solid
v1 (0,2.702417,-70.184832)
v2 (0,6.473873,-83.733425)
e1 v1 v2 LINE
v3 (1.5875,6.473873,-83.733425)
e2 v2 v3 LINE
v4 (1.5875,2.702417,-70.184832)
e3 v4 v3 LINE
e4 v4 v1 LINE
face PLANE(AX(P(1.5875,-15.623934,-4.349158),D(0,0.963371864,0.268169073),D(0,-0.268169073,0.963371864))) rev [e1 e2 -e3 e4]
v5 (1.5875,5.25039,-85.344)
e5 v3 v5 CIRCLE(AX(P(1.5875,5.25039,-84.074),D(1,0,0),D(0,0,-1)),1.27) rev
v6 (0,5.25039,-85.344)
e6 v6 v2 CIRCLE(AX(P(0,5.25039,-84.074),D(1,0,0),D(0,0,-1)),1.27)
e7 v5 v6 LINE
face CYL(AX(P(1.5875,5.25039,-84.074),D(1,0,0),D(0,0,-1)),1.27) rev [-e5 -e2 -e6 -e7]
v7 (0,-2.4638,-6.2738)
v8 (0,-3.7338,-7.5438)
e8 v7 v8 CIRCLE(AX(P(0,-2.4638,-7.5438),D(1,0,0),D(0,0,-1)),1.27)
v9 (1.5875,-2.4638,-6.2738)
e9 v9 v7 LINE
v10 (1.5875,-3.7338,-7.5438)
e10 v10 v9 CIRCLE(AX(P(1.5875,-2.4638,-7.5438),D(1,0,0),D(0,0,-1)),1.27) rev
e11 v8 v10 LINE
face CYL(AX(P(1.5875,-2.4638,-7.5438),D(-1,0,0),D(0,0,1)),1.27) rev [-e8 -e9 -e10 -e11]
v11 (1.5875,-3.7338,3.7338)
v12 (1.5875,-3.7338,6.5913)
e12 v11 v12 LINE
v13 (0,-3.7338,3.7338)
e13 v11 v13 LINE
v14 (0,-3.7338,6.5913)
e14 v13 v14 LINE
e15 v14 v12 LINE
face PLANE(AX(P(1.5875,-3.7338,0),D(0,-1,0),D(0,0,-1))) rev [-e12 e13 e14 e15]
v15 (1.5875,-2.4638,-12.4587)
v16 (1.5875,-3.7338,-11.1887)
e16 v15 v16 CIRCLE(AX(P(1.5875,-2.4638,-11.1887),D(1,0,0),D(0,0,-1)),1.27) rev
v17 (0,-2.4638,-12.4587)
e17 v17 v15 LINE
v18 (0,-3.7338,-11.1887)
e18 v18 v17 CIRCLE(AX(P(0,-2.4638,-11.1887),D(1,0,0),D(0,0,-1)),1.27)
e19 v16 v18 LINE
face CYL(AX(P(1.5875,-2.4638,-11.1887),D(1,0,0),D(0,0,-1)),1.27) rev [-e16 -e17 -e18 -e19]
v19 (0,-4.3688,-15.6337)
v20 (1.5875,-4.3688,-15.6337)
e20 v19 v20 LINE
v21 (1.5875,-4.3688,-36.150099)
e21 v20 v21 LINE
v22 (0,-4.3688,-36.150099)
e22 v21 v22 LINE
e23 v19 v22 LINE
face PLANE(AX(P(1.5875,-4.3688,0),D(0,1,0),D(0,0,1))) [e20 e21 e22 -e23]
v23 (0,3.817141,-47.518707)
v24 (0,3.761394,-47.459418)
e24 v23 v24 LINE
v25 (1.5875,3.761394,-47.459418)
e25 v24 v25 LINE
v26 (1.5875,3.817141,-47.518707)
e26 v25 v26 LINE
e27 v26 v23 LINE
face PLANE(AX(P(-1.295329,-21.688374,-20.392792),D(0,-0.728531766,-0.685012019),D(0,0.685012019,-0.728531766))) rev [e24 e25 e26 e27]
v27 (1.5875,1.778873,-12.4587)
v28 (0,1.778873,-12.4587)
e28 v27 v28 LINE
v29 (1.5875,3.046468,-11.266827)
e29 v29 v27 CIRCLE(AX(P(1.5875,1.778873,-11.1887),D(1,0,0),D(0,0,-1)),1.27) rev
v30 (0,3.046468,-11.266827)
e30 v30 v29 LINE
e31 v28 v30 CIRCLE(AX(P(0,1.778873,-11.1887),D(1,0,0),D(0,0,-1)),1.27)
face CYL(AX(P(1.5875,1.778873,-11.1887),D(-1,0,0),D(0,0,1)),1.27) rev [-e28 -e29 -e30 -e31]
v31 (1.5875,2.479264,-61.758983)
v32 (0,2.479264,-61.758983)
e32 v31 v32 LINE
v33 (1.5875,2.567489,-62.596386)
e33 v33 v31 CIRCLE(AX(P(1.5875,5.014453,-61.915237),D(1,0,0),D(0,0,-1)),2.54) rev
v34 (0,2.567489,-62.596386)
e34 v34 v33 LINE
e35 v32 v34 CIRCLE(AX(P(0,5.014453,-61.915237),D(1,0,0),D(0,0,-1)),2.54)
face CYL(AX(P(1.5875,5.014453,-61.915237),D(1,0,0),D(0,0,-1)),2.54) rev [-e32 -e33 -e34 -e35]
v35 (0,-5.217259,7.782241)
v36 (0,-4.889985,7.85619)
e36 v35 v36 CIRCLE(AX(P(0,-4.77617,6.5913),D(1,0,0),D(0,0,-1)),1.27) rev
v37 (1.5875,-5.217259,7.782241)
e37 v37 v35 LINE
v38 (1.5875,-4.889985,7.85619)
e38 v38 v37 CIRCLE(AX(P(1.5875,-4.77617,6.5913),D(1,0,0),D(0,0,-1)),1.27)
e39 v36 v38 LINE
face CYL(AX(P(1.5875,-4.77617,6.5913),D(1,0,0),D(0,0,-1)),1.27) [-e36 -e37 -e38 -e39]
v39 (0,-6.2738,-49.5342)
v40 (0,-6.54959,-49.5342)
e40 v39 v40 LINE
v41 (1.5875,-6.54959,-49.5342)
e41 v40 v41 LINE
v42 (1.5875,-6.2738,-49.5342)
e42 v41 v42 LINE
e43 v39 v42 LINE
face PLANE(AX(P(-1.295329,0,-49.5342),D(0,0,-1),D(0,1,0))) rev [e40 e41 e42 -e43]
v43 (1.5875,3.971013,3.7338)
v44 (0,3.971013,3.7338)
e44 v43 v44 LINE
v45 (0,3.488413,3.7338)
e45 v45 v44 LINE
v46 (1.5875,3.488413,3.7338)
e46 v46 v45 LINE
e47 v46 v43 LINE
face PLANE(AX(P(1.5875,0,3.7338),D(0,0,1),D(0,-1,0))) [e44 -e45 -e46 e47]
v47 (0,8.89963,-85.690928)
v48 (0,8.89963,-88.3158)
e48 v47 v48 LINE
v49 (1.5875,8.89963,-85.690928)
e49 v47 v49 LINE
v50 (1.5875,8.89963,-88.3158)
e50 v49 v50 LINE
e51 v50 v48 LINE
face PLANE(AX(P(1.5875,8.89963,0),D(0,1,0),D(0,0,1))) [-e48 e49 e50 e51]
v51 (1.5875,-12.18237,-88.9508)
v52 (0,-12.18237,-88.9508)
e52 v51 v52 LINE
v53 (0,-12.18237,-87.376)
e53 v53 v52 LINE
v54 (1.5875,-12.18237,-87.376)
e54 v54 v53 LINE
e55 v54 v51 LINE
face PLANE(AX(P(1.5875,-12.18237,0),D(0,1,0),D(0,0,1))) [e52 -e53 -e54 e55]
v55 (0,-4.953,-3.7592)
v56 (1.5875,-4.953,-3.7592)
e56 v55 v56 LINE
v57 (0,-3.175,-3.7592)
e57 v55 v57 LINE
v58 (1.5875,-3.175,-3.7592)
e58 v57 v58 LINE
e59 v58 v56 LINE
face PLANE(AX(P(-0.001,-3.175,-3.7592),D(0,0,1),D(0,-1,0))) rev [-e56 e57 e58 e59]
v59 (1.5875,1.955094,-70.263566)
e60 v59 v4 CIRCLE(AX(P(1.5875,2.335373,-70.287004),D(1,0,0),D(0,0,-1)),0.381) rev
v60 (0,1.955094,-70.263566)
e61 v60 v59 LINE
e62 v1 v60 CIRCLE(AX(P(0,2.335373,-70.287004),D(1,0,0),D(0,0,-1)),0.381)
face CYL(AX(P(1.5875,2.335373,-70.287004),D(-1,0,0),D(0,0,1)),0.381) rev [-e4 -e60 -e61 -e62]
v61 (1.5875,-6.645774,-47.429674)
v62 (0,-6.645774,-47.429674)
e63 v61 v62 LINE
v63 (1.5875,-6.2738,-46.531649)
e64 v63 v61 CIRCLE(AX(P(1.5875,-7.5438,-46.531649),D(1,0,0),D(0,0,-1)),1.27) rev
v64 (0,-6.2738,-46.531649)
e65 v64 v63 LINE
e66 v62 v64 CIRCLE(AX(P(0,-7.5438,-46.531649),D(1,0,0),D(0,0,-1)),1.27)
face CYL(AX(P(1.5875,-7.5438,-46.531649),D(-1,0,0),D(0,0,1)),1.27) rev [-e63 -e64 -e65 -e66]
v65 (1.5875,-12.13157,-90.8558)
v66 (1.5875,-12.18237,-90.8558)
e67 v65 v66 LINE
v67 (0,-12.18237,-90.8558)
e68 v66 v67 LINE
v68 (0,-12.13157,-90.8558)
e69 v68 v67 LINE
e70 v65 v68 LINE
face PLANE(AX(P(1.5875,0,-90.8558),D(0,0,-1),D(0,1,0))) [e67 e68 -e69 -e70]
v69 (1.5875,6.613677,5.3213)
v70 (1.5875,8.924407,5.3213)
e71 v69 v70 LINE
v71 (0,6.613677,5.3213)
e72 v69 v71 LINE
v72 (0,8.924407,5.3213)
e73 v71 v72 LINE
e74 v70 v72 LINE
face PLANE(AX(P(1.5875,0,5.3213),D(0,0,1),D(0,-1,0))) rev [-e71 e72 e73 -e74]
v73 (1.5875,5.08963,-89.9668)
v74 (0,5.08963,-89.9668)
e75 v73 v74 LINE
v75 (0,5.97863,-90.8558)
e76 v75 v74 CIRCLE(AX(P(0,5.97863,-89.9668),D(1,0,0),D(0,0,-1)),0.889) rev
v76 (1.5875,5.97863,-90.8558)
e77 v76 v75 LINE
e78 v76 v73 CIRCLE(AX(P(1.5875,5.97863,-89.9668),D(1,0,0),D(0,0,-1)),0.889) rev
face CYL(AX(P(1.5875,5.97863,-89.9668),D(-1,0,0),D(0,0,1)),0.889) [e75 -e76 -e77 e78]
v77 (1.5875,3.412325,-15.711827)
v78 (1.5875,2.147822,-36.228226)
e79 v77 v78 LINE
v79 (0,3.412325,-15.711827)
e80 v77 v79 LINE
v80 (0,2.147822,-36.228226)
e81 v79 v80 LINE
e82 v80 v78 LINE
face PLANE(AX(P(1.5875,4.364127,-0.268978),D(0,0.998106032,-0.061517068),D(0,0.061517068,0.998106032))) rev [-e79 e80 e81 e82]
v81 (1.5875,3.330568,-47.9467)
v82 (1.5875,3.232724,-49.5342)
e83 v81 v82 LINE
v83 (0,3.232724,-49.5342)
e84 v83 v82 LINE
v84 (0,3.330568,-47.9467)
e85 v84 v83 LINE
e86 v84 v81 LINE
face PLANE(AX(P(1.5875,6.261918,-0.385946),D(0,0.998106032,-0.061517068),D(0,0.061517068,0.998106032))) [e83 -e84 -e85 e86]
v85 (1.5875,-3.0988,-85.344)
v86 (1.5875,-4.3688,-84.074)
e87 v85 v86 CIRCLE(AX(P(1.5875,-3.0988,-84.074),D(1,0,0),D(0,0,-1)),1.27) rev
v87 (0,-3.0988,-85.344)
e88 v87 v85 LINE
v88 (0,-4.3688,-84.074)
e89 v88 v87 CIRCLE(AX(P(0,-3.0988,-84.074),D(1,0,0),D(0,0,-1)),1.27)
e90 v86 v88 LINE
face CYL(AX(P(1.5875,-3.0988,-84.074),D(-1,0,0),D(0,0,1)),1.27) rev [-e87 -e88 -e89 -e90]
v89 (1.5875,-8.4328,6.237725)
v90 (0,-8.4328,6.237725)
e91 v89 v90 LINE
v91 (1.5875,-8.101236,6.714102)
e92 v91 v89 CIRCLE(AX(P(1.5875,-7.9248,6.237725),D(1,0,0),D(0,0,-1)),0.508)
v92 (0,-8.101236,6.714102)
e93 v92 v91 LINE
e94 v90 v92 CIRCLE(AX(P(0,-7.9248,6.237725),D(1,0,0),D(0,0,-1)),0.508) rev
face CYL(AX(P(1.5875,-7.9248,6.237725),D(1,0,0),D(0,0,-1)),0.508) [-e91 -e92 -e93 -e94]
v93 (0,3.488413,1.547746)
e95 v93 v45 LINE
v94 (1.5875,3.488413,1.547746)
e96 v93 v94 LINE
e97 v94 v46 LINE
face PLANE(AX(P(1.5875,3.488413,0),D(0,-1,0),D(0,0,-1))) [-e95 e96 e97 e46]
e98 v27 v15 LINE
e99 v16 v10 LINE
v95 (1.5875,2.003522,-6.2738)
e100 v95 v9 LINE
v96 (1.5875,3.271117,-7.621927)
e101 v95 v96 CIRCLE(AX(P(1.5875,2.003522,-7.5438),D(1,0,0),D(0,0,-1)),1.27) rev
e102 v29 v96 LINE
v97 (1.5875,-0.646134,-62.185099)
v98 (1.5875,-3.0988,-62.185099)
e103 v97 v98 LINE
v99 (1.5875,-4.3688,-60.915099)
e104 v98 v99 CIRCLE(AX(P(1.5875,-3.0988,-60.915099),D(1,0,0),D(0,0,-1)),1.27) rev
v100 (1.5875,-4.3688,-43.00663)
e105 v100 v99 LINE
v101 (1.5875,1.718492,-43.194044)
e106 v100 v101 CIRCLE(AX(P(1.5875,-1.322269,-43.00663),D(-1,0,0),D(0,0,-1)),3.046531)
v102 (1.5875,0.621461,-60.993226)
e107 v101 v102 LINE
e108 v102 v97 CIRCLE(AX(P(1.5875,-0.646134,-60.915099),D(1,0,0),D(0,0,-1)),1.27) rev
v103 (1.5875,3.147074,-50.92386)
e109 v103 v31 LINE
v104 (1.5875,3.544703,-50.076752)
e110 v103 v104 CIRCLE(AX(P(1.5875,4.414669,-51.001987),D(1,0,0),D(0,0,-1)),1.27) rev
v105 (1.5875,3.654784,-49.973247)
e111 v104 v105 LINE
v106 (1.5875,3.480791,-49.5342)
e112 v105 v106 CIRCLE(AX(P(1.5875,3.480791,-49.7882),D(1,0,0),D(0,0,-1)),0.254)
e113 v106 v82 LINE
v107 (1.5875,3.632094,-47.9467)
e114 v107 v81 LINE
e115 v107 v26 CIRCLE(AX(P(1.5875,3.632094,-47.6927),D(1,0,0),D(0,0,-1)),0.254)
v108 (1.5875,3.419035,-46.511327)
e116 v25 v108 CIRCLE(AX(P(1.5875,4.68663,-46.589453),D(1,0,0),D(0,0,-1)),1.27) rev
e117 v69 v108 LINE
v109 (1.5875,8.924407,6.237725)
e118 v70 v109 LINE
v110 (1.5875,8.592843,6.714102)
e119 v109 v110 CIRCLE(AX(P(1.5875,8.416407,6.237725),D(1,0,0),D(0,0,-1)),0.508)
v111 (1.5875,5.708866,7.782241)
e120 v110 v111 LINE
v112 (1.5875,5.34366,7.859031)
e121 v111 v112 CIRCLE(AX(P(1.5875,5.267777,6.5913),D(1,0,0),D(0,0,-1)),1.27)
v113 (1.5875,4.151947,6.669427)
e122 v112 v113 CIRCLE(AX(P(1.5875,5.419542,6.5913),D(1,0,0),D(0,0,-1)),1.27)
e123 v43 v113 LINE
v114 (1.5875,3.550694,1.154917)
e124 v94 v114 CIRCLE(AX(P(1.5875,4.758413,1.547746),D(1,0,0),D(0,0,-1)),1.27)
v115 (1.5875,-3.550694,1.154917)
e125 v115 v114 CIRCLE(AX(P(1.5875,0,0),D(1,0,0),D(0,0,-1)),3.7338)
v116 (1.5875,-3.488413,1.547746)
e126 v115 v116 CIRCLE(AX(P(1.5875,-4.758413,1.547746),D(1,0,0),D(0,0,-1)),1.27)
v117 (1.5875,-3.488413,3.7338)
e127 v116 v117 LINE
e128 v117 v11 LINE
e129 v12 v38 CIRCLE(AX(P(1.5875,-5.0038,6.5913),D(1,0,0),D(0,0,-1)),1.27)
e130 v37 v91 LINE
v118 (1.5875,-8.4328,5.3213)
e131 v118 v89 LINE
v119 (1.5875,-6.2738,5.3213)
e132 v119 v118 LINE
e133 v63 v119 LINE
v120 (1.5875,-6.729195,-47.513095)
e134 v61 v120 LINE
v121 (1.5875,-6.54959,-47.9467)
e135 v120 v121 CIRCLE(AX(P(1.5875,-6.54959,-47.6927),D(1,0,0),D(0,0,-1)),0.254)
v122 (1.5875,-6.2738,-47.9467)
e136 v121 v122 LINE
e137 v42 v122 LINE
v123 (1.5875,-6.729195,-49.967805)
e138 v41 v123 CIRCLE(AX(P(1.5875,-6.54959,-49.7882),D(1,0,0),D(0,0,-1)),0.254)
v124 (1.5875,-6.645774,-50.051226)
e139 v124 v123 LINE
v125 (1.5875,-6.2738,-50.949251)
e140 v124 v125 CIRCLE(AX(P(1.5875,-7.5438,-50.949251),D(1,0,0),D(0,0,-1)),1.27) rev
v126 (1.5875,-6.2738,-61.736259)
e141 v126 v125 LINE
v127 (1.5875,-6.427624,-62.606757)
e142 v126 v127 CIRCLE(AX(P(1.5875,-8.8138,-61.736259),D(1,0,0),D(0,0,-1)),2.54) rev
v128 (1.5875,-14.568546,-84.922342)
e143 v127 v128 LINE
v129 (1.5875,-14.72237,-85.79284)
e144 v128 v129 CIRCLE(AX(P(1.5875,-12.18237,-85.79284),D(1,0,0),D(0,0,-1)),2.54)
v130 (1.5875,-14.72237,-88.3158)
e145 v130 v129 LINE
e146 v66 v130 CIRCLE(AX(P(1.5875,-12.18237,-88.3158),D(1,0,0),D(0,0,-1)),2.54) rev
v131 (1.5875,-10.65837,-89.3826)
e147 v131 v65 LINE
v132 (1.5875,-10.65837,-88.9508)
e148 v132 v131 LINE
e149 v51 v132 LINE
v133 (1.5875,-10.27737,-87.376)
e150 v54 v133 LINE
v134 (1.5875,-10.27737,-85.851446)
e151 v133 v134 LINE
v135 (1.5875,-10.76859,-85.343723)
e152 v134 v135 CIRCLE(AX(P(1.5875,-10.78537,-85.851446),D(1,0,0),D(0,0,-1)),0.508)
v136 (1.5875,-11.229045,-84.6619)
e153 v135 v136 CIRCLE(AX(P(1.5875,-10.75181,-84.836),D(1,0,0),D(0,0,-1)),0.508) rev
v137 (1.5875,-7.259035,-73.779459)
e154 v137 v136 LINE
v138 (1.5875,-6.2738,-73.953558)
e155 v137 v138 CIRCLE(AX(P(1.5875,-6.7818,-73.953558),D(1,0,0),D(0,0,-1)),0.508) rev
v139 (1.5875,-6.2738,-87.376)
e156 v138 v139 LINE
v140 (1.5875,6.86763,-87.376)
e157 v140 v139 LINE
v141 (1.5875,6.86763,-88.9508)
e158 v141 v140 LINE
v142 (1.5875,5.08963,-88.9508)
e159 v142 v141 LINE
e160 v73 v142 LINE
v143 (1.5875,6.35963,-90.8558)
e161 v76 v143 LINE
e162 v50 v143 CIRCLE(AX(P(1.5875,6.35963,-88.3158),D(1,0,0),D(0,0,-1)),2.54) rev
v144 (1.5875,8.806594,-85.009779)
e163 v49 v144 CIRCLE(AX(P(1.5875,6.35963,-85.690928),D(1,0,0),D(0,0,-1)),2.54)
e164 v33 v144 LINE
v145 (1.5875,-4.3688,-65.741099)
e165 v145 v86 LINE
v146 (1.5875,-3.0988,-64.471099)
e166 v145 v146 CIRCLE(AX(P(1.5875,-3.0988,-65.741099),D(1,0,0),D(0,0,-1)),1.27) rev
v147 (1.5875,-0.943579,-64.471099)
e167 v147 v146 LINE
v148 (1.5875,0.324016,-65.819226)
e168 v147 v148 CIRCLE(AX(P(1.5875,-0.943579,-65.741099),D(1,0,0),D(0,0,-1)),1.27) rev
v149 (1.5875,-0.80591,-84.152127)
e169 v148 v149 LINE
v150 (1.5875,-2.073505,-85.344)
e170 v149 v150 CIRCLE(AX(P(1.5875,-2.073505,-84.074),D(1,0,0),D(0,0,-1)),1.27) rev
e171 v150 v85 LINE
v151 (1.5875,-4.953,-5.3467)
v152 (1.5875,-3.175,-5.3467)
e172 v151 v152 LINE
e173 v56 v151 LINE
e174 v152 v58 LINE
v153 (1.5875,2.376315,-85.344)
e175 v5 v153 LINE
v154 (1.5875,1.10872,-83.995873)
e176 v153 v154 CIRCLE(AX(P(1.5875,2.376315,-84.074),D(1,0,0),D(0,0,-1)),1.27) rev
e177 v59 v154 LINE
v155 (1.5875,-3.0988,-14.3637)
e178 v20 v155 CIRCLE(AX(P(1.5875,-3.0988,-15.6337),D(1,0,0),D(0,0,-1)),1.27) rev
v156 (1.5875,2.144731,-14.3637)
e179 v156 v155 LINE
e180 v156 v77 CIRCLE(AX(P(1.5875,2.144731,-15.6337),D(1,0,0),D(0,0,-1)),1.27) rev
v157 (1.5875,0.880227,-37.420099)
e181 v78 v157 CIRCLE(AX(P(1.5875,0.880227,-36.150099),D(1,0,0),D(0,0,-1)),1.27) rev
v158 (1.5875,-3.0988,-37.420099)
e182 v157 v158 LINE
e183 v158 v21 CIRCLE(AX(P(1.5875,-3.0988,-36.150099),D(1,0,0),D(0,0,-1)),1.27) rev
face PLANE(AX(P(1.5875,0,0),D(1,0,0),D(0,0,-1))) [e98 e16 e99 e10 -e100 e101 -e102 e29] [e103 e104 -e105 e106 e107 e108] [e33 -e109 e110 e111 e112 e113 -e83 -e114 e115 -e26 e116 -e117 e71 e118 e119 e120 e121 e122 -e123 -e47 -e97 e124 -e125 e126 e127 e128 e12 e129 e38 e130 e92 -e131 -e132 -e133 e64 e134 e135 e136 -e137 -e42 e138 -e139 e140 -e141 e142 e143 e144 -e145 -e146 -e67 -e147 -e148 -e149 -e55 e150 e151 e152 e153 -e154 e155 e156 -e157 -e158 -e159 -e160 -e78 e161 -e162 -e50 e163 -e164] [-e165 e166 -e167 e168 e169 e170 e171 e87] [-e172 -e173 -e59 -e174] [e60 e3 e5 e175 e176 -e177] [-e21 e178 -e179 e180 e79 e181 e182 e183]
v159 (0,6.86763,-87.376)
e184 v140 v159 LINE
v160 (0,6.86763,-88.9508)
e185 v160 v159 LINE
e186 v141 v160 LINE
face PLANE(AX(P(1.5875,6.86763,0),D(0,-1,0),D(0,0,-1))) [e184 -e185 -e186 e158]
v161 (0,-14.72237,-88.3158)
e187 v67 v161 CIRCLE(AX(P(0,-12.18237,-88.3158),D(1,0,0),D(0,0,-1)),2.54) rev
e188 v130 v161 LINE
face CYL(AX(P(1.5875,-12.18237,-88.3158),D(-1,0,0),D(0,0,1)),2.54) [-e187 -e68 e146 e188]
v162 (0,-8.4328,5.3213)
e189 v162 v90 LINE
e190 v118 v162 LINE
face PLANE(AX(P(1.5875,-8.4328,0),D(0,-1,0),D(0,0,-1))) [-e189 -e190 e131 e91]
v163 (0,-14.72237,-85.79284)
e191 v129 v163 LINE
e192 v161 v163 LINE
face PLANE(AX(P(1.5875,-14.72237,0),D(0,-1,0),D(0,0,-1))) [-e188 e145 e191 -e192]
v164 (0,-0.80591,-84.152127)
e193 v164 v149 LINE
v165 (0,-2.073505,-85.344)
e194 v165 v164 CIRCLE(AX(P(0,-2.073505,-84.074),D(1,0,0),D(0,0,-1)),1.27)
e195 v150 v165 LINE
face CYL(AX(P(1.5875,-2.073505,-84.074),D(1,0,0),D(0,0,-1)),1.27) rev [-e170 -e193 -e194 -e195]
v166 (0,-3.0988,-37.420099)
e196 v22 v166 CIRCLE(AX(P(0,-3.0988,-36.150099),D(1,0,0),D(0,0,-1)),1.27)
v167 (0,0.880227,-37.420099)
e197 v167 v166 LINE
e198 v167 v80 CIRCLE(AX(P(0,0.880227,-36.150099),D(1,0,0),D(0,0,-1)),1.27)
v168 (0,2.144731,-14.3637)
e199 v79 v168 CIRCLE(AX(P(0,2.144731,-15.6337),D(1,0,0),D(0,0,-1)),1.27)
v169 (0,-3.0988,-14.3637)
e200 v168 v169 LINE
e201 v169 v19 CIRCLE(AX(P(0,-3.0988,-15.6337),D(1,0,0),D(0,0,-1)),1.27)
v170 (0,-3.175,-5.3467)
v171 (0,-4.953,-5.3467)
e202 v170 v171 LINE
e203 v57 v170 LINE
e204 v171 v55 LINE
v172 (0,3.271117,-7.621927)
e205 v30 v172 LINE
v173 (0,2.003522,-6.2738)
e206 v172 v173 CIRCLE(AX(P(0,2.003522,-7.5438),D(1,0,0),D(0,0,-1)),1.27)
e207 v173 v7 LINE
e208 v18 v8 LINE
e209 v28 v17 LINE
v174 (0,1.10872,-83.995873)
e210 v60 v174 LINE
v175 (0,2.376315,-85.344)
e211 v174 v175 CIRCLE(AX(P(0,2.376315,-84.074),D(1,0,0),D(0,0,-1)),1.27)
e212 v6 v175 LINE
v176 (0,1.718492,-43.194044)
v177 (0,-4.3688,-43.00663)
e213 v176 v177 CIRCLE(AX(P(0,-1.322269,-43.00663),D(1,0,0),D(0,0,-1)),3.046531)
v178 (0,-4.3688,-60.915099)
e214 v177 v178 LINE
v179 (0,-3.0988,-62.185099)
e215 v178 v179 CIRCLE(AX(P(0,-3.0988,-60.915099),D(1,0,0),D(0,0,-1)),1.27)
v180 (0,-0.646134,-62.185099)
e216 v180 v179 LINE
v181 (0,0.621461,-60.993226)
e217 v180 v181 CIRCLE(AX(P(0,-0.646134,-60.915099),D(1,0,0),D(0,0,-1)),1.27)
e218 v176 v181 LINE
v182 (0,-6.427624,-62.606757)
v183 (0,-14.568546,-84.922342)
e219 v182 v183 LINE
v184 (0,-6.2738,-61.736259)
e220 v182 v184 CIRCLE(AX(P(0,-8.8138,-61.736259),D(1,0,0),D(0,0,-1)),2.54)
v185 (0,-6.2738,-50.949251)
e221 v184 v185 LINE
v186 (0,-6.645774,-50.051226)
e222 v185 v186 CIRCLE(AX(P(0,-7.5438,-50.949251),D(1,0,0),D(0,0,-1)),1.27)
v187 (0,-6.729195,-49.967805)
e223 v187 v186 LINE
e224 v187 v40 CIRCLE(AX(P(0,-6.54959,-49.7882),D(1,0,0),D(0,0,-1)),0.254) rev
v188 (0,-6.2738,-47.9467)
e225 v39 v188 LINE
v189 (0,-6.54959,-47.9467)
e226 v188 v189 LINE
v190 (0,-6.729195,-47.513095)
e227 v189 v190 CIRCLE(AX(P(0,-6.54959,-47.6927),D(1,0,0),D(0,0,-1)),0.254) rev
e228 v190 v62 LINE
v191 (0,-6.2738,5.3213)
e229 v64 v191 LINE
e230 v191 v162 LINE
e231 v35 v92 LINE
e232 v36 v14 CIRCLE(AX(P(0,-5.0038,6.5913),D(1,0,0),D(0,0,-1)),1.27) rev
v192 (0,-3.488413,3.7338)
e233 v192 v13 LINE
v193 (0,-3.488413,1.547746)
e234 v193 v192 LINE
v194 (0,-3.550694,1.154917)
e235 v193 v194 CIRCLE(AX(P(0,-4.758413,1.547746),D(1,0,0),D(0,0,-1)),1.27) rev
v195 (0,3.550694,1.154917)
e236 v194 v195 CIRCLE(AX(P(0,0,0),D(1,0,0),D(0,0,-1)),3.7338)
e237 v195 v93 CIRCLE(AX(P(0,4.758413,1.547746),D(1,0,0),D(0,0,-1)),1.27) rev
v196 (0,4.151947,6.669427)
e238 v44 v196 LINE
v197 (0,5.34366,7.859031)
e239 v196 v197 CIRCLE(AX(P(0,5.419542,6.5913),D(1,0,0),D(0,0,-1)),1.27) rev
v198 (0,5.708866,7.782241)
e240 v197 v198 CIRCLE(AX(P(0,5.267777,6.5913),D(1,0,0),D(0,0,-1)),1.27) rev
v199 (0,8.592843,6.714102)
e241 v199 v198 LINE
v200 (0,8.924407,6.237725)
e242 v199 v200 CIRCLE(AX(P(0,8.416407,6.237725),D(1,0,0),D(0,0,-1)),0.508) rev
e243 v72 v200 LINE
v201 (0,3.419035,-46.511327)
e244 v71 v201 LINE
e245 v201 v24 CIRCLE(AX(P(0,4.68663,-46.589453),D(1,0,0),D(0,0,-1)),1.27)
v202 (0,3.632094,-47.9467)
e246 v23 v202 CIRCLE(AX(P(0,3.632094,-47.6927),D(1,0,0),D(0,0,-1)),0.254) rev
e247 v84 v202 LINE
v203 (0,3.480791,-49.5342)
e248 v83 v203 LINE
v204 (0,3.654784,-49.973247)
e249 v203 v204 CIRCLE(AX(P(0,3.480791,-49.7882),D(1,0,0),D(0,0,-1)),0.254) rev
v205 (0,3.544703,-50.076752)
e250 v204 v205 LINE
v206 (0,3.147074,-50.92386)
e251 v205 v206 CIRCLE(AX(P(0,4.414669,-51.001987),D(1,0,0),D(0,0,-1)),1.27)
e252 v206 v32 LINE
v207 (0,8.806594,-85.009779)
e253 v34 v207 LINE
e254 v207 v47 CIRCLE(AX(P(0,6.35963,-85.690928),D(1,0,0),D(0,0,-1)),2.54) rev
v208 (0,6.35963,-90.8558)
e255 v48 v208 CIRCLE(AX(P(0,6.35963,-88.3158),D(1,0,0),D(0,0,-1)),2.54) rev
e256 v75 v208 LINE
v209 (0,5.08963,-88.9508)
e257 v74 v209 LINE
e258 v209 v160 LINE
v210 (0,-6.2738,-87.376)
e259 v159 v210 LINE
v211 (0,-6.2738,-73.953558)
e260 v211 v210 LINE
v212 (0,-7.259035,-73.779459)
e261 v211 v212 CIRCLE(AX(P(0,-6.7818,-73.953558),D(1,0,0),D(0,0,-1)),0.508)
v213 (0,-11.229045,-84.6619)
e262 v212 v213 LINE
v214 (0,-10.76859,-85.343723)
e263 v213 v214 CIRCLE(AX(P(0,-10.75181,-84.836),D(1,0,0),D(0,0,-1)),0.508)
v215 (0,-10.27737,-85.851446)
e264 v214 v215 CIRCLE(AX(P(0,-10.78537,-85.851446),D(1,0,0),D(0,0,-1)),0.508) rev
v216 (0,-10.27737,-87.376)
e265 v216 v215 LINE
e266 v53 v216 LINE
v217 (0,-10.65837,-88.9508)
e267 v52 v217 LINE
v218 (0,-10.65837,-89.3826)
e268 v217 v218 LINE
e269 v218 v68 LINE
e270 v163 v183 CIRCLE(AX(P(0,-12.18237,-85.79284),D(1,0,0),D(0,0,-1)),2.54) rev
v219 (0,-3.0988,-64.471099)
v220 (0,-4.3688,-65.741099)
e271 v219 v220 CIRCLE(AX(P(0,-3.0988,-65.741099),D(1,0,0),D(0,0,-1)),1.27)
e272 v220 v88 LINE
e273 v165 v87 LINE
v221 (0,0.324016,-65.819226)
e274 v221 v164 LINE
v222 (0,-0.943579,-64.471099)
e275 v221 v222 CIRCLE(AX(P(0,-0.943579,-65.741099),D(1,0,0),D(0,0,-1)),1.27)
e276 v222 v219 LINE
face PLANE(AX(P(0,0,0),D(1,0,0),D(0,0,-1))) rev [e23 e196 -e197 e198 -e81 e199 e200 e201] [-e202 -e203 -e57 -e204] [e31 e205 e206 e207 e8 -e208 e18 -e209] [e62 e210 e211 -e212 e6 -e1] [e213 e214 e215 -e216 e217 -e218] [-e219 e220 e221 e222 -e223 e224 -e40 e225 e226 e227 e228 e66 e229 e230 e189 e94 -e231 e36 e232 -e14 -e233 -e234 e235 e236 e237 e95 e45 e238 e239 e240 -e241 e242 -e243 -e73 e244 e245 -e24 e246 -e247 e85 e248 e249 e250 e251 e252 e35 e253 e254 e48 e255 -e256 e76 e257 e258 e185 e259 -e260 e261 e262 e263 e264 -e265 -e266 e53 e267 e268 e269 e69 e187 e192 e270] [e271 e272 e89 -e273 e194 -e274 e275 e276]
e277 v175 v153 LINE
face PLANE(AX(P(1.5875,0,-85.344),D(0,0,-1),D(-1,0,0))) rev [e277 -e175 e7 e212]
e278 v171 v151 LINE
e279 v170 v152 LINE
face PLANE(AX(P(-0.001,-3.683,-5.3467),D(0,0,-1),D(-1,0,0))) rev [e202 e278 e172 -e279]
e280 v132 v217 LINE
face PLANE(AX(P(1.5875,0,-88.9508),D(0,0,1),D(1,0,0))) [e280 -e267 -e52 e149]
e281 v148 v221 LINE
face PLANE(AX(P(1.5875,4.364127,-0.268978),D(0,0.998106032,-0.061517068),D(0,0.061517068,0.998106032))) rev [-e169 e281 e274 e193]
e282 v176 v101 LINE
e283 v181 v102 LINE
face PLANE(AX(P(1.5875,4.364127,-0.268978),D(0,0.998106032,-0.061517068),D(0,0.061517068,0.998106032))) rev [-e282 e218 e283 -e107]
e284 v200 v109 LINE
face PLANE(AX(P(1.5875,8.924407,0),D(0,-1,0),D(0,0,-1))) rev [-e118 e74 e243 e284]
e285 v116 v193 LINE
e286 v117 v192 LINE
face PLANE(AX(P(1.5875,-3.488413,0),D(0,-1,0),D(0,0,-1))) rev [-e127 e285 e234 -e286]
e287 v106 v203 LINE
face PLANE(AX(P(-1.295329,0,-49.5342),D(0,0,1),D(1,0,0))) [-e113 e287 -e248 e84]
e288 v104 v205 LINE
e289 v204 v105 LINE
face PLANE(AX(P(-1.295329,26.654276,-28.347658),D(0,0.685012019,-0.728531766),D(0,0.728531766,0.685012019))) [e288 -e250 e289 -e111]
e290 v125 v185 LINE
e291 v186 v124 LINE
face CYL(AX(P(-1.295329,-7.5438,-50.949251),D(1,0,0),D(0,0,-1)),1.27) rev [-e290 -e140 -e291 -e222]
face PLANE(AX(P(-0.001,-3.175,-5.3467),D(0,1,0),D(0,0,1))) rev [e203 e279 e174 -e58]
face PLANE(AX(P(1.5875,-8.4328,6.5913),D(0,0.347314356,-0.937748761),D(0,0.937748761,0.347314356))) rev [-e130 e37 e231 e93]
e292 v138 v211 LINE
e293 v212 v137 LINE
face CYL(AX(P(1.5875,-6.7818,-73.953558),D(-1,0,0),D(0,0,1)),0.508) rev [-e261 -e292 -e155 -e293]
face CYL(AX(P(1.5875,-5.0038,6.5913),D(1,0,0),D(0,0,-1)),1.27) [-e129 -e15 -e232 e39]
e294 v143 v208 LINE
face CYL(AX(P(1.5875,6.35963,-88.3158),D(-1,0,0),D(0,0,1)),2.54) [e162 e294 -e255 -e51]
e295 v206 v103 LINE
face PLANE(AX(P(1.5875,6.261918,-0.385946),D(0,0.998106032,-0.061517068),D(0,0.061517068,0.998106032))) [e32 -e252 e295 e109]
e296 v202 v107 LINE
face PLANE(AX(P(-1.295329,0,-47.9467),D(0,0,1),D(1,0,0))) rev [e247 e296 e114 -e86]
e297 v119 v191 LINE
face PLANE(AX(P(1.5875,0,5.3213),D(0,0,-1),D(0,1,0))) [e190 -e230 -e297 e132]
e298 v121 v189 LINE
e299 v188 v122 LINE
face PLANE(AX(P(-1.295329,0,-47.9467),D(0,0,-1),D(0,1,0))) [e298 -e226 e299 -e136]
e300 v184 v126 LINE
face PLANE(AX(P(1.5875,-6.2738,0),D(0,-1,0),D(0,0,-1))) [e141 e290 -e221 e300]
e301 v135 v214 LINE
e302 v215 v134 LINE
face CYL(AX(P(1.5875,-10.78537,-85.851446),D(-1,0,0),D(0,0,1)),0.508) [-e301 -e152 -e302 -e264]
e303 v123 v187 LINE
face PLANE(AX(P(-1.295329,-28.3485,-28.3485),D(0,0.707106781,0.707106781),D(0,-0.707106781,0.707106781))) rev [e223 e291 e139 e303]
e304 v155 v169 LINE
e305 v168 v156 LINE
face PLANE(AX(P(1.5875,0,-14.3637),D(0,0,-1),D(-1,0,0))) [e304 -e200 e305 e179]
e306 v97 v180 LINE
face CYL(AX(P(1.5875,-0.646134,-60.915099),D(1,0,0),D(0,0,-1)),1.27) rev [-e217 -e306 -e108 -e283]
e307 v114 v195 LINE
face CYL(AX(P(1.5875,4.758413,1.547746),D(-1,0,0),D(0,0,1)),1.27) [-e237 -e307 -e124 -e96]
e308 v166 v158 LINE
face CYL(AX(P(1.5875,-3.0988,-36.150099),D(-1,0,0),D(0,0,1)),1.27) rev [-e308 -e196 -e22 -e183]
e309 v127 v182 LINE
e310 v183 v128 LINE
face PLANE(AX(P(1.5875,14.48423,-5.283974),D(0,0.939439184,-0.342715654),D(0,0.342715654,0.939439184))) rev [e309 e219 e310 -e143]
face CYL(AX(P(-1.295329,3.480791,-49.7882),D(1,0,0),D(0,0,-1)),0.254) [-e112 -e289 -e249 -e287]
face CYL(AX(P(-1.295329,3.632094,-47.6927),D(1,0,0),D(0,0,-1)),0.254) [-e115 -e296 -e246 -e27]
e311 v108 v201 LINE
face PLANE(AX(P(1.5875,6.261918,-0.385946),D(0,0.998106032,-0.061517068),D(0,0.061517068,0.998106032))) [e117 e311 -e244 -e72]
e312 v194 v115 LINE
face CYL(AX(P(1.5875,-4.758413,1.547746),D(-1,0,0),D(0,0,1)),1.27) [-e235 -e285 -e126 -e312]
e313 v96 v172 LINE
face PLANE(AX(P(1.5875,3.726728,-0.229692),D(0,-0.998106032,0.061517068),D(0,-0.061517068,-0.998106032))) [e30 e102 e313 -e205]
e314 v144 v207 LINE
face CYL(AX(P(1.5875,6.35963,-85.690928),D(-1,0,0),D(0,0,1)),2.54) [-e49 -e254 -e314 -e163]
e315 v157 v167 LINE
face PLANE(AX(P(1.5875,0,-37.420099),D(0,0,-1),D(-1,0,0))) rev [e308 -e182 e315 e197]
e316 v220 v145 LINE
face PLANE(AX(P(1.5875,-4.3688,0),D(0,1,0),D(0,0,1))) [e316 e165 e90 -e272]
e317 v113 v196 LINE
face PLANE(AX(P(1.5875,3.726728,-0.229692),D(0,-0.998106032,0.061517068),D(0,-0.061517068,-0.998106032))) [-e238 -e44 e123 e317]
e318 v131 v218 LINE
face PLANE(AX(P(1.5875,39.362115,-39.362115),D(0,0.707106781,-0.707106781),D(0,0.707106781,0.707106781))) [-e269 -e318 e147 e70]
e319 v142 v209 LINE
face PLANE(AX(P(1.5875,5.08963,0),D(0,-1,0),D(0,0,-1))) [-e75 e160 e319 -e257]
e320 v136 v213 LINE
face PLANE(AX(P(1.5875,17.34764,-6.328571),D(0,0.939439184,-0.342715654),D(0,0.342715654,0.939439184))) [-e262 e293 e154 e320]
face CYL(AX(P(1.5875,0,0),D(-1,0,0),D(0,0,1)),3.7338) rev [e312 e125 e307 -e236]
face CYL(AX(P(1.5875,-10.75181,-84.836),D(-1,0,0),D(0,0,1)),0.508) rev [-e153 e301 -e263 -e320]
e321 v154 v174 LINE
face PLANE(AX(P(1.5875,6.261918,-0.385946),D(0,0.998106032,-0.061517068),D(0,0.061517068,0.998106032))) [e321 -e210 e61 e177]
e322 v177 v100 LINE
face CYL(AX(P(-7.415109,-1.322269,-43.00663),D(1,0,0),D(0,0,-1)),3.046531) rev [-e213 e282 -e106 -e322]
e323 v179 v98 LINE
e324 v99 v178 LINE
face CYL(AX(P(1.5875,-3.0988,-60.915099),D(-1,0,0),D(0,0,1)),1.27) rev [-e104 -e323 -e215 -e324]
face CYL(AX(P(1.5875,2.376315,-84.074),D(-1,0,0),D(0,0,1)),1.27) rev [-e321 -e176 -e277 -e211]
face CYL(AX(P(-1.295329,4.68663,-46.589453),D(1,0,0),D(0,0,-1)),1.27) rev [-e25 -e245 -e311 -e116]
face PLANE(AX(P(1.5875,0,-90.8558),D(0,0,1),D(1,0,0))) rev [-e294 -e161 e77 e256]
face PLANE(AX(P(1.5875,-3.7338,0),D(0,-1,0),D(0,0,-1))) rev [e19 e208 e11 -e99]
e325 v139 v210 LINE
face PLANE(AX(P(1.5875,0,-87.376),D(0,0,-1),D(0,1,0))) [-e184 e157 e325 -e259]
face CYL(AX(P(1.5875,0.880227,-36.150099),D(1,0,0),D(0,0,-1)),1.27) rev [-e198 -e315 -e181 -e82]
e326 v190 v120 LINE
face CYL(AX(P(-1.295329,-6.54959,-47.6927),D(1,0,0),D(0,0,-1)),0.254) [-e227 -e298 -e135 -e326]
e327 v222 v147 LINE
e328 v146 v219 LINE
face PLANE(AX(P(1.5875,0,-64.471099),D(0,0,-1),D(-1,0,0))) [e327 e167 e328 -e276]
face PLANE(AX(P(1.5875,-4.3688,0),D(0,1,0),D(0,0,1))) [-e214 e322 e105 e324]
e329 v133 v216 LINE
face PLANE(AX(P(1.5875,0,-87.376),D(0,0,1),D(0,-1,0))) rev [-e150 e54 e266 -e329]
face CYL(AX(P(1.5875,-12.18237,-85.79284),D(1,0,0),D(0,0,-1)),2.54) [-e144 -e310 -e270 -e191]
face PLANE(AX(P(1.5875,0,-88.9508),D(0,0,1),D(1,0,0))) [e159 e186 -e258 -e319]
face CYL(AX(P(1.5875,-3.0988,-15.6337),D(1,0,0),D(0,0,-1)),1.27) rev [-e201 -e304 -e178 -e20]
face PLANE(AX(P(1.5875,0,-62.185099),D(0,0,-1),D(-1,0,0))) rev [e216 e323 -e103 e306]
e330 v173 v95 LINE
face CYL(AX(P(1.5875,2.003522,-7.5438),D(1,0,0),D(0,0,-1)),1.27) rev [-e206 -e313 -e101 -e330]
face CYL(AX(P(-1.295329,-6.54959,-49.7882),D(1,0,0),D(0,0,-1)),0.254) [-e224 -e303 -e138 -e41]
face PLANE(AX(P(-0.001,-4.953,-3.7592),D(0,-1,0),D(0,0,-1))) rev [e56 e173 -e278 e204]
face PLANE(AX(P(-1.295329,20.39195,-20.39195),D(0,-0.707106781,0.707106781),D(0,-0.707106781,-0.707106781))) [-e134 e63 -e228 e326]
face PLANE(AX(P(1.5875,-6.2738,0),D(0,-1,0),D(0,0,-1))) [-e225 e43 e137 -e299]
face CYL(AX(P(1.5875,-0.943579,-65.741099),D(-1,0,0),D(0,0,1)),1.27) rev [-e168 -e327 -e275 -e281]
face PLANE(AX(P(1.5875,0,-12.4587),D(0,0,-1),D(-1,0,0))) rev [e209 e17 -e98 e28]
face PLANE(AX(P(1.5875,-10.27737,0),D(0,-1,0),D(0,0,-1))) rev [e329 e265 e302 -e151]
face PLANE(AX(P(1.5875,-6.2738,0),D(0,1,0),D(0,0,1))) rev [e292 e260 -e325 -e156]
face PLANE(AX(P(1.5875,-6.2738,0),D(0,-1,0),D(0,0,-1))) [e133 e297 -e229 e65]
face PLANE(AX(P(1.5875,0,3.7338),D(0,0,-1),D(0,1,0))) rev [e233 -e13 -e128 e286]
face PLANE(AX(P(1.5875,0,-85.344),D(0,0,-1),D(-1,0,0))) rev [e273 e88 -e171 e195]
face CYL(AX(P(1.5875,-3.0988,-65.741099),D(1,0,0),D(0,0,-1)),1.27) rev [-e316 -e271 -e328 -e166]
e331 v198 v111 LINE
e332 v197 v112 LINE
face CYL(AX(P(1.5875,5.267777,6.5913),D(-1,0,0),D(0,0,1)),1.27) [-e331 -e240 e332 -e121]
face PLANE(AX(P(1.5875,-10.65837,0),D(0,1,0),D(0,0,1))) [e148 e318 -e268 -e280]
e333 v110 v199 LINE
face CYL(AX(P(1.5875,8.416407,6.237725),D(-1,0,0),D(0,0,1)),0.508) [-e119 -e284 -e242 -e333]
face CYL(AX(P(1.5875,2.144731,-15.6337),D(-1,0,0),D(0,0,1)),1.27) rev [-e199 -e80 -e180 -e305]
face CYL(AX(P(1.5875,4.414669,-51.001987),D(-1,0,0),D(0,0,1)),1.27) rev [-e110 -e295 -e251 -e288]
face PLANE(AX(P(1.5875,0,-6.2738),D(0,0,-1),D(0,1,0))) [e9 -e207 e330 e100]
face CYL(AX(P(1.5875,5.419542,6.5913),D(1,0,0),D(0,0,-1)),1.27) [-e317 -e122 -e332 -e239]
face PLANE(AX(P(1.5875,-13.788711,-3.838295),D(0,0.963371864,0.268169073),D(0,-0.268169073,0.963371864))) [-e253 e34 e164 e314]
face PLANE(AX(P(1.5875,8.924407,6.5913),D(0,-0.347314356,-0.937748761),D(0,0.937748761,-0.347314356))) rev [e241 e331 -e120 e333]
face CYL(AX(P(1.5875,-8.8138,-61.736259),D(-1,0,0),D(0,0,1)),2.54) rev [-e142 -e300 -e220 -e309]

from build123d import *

# Parameters (mm, degrees)
BOSS_EXTRUDE1_DEPTH = 1.5875
CUT_EXTRUDE2_DEPTH  = 93.054574745
FILLET1_R           = 2.54
FILLET2_R           = 1.27
FILLET3_R           = 0.508
FILLET4_R           = 0.508
BOSS_EXTRUDE3_DEPTH = 1.5875
FILLET5_R           = 1.27
FILLET6_R           = 0.254
BOSS_EXTRUDE4_DEPTH = 1.5875
CUT_EXTRUDE1_REACH  = 94.055
FILLET9_R           = 1.27
FILLET10_R          = 0.381
FILLET12_R          = 1.27
FILLET13_R          = 0.508


with BuildPart() as part:
    # Sketch1 → Boss-Extrude1 (new body)
    with BuildSketch(Plane(origin=(0, 0, 0), x_dir=(0, 0, -1), z_dir=(1, 0, 0))):
        with BuildLine():
            Line((62.185099246, -6.2738), (85.344, -14.722370106))
            Line((85.344, -14.722370106), (88.3158, -14.722370106))
            ThreePointArc((88.3158, -14.722370106), (90.111851224, -13.978421331), (90.8558, -12.182370106))
            Line((90.8558, -12.182370106), (90.8558, -12.131570106))
            Line((90.8558, -12.131570106), (89.3826, -10.658370106))
            Line((89.3826, -10.658370106), (88.9508, -10.658370106))
            Line((88.9508, -10.658370106), (88.9508, -12.182370106))
            Line((88.9508, -12.182370106), (87.376, -12.182370106))
            Line((87.376, -12.182370106), (87.376, -10.277370106))
            Line((87.376, -10.277370106), (85.344, -10.277370106))
            Line((85.344, -10.277370106), (85.344, -11.477881212))
            Line((85.344, -11.477881212), (71.07876946, -6.2738))
            Line((71.07876946, -6.2738), (87.376, -6.2738))
            Line((87.376, -6.2738), (87.376, 6.867629894))
            Line((87.376, 6.867629894), (88.9508, 6.867629894))
            Line((88.9508, 6.867629894), (88.9508, 5.089629894))
            Line((88.9508, 5.089629894), (89.9668, 5.089629894))
            ThreePointArc((89.9668, 5.089629894), (90.595417928, 5.350011965), (90.8558, 5.978629894))
            Line((90.8558, 5.978629894), (90.8558, 6.359629894))
            ThreePointArc((90.8558, 6.359629894), (90.111851224, 8.155681118), (88.3158, 8.899629894))
            Line((88.3158, 8.899629894), (85.344, 8.899629894))
            Line((85.344, 8.899629894), (62.185099246, 2.453000952))
            Line((62.185099246, 2.453000952), (-5.3213, 6.613676867))
            Line((-5.3213, 6.613676867), (-5.3213, 8.924406911))
            Line((-5.3213, 8.924406911), (-7.8613, 8.924406911))
            Line((-7.8613, 8.924406911), (-7.8613, 4.225406911))
            Line((-7.8613, 4.225406911), (-3.7338, 3.971013401))
            Line((-3.7338, 3.971013401), (-3.7338, 3.488413401))
            Line((-3.7338, 3.488413401), (-1.331252938, 3.488413401))
            ThreePointArc((-1.331252938, 3.488413401), (3.7338, 0), (-1.331252938, -3.488413401))
            Line((-1.331252938, -3.488413401), (-3.7338, -3.488413401))
            Line((-3.7338, -3.488413401), (-3.7338, -3.7338))
            Line((-3.7338, -3.7338), (-5.3213, -3.7338))
            Line((-5.3213, -3.7338), (-7.8613, -3.7338))
            Line((-7.8613, -3.7338), (-7.8613, -8.4328))
            Line((-7.8613, -8.4328), (-5.3213, -8.4328))
            Line((-5.3213, -8.4328), (-5.3213, -6.2738))
            Line((-5.3213, -6.2738), (62.185099246, -6.2738))
        make_face()
        Polygon((12.4587, -3.7338), (6.2738, -3.7338), (6.2738, 3.354206983), (12.4587, 2.973008093), align=None, mode=Mode.SUBTRACT)
        Polygon((14.3637, -4.3688), (14.3637, 3.495415512), (37.420099246, 2.074362011), (37.420099246, -4.3688), align=None, mode=Mode.SUBTRACT)
        Polygon((64.471099246, -4.3688), (64.471099246, 0.407106085), (85.344, -0.879370106), (85.344, -4.3688), align=None, mode=Mode.SUBTRACT)
        Polygon((39.325099246, -4.3688), (39.325099246, 1.956949622), (62.185099246, 0.548000952), (62.185099246, -4.3688), align=None, mode=Mode.SUBTRACT)
        Polygon((85.344, 6.922200335), (85.344, 1.025629894), (68.00108793, 2.094539469), align=None, mode=Mode.SUBTRACT)
    extrude(amount=BOSS_EXTRUDE1_DEPTH)

    # Sketch7 → Cut-Extrude2 (cut, through all)
    with BuildSketch(Plane.ZY):
        Polygon((6.5913, 8.924406911), (7.8613, 5.495406911), (7.8613, 8.924406911), align=None)
        Polygon((6.5913, -8.4328), (7.8613, -5.0038), (7.8613, -8.4328), align=None)
    extrude(amount=-CUT_EXTRUDE2_DEPTH, mode=Mode.SUBTRACT)

    # Fillet1
    fillet1_edges = [part.edges().sort_by_distance(p)[0] for p in [
        (0.79375, 2.453000952, -62.185099246),
        (0.79375, 8.899629894, -85.344),
        (0.79375, -14.722370106, -85.344),
        (0.79375, -6.2738, -62.185099246),
    ]]
    fillet(fillet1_edges, radius=FILLET1_R)

    # Fillet2
    fillet2_edges = [part.edges().sort_by_distance(p)[0] for p in [
        (0.79375, -4.3688, -85.344),
        (0.79375, -0.879370106, -85.344),
        (0.79375, 0.407106085, -64.471099246),
        (0.79375, -4.3688, -64.471099246),
        (0.79375, 1.025629894, -85.344),
        (0.79375, 6.922200335, -85.344),
        (0.79375, -4.3688, -37.420099246),
        (0.79375, 2.074362011, -37.420099246),
        (0.79375, 3.495415512, -14.3637),
        (0.79375, -4.3688, -14.3637),
        (0.79375, -4.3688, -62.185099246),
        (0.79375, 0.548000952, -62.185099246),
        (0.79375, -3.7338, -12.4587),
        (0.79375, 2.973008093, -12.4587),
        (0.79375, 3.354206983, -6.2738),
        (0.79375, -3.7338, -6.2738),
    ]]
    fillet(fillet2_edges, radius=FILLET2_R)

    # Fillet3
    fillet3_edges = [part.edges().sort_by_distance(p)[0] for p in [
        (0.79375, -6.2738, -71.07876946),
        (0.79375, -11.477881212, -85.344),
    ]]
    fillet(fillet3_edges, radius=FILLET3_R)

    # Fillet4
    fillet4_edges = [part.edges().sort_by_distance(p)[0] for p in [
        (0.79375, -10.277370106, -85.344),
    ]]
    fillet(fillet4_edges, radius=FILLET4_R)

    # Sketch6 → Boss-Extrude3 (add)
    with BuildSketch(Plane.ZY.offset(-1.5875)):
        Polygon((-47.9467, -6.2738), (-47.0577, -6.2738), (-47.9467, -7.1628), align=None)
        Polygon((-49.5342, -6.2738), (-50.4232, -6.2738), (-49.5342, -7.1628), align=None)
        Polygon((-49.5342, 3.232723947), (-50.421516262, 3.178035274), (-49.5342, 4.121723947), align=None)
        Polygon((-47.059383738, 3.385256278), (-47.9467, 4.219567605), (-47.9467, 3.330567605), align=None)
        Polygon((-47.9467, 4.219567605), (-47.9467, 3.330567605), (-47.059383738, 3.385256278), align=None)
        Polygon((-49.5342, 4.121723947), (-49.5342, 3.232723947), (-50.421516262, 3.178035274), align=None)
        Polygon((-50.4232, -6.2738), (-49.5342, -7.1628), (-49.5342, -6.2738), align=None)
        Polygon((-47.9467, -7.1628), (-47.9467, -6.2738), (-47.0577, -6.2738), align=None)
    extrude(amount=BOSS_EXTRUDE3_DEPTH)

    # Fillet5
    fillet5_edges = [part.edges().sort_by_distance(p)[0] for p in [
        (0.79375, 3.385256278, -47.059383738),
        (0.79375, 3.178035274, -50.421516262),
        (0.79375, -6.2738, -50.4232),
        (0.79375, -6.2738, -47.0577),
    ]]
    fillet(fillet5_edges, radius=FILLET5_R)

    # Fillet6
    fillet6_edges = [part.edges().sort_by_distance(p)[0] for p in [
        (0.79375, 4.219567605, -47.9467),
        (0.79375, 4.121723947, -49.5342),
        (0.79375, -7.1628, -49.5342),
        (0.79375, -7.1628, -47.9467),
    ]]
    fillet(fillet6_edges, radius=FILLET6_R)

    # Sketch4 → Boss-Extrude4 (add)
    with BuildSketch(Plane(origin=(1.5875, 0, 0), x_dir=(0, 0, -1), z_dir=(1, 0, 0))):
        with BuildLine():
            Line((39.325099246, 1.956949622), (43.194043845, 1.718491864))
            ThreePointArc((43.194043845, 1.718491864), (39.961542096, -1.228517825), (43.006630195, -4.3688))
            Line((43.006630195, -4.3688), (39.325099246, -4.3688))
            Line((39.325099246, -4.3688), (39.325099246, 1.956949622))
        make_face()
    extrude(amount=-BOSS_EXTRUDE4_DEPTH)

    # Sketch5 → Cut-Extrude1 (cut, up to next)
    with BuildSketch(Plane(origin=(1.5875, 0, 0), x_dir=(0, 0, -1), z_dir=(1, 0, 0)), mode=Mode.PRIVATE) as cut_extrude1_sk1:
        Polygon((3.7592, -4.445), (3.7592, -4.953), (5.3467, -4.953), (5.3467, -4.445), (5.3467, -3.683), (5.3467, -3.175), (3.7592, -3.175), (3.7592, -3.683), align=None)
    cut_extrude1_tool1 = extrude(cut_extrude1_sk1.sketch, amount=-CUT_EXTRUDE1_REACH, mode=Mode.PRIVATE) & part.part
    add(cut_extrude1_tool1.solids().sort_by_distance((1.5875, -4.064, -4.55295))[0], mode=Mode.SUBTRACT)

    # Fillet9
    fillet9_edges = [part.edges().sort_by_distance(p)[0] for p in [
        (0.79375, 3.488413401, 1.331252938),
        (0.79375, -3.488413401, 1.331252938),
    ]]
    fillet(fillet9_edges, radius=FILLET9_R)

    # Fillet10
    fillet10_edges = [part.edges().sort_by_distance(p)[0] for p in [
        (0.79375, 2.094539469, -68.00108793),
    ]]
    fillet(fillet10_edges, radius=FILLET10_R)

    # Fillet12
    # the kernel refuses this fillet: 1.27 mm, written as the material it takes off along each edge
    with BuildSketch(Plane(origin=(-0.569074331, -5.0038, 7.8613), x_dir=(0, 1, 0), z_dir=(1, 0, 0))) as fillet12_piece_1:
        with BuildLine():
            CenterArc((FILLET12_R * 0.179236009778, -FILLET12_R), FILLET12_R, 90, 20.32313683)
            Line((-FILLET12_R * 0.168078346046, -FILLET12_R * 0.0622512392763), (0, 0))
            Line((0, 0), (FILLET12_R * 0.179236009778, 0))
        make_face()
    extrude(amount=2.725648662, mode=Mode.SUBTRACT)
    with BuildSketch(Plane(origin=(-3.175, -3.7338, 7.8613), x_dir=(0, 1.571796061637141e-12, -1.0), z_dir=(1, 0, 0))) as fillet12_piece_2:
        with BuildLine():
            CenterArc((FILLET12_R, -FILLET12_R), FILLET12_R, 90, 90)
            Line((0, -FILLET12_R), (0, 0))
            Line((0, 0), (FILLET12_R, 0))
        make_face()
    extrude(amount=7.9375, mode=Mode.SUBTRACT)
    with BuildSketch(Plane(origin=(-0.569074331, 5.495406911, 7.8613), x_dir=(0, -1, 0), z_dir=(1, 0, 0))) as fillet12_piece_3:
        with BuildLine():
            CenterArc((FILLET12_R * 0.179236009778, FILLET12_R), FILLET12_R, 249.67686317, 20.32313683)
            Line((-FILLET12_R * 0.168078346046, FILLET12_R * 0.0622512392763), (0, 0))
            Line((0, 0), (FILLET12_R * 0.179236009778, 0))
        make_face()
    extrude(amount=2.725648662, mode=Mode.SUBTRACT)
    with BuildSketch(Plane(origin=(-2.985337445, 4.225406911, 7.8613), x_dir=(0, -0.06151706759749907, -0.9981060316390262), z_dir=(1, 0, 0))) as fillet12_piece_4:
        with BuildLine():
            CenterArc((FILLET12_R * 0.940263762219, FILLET12_R), FILLET12_R, 183.526895232, 86.473104768)
            Line((-FILLET12_R * 0.0578422694199, FILLET12_R * 0.938482932403), (0, 0))
            Line((0, 0), (FILLET12_R * 0.940263762219, 0))
        make_face()
    extrude(amount=7.55817489, mode=Mode.SUBTRACT)

    # Fillet13
    fillet13_edges = [part.edges().sort_by_distance(p)[0] for p in [
        (0.79375, 8.924406911, 6.5913),
        (0.79375, -8.4328, 6.5913),
    ]]
    fillet(fillet13_edges, radius=FILLET13_R)


solid = part.part
